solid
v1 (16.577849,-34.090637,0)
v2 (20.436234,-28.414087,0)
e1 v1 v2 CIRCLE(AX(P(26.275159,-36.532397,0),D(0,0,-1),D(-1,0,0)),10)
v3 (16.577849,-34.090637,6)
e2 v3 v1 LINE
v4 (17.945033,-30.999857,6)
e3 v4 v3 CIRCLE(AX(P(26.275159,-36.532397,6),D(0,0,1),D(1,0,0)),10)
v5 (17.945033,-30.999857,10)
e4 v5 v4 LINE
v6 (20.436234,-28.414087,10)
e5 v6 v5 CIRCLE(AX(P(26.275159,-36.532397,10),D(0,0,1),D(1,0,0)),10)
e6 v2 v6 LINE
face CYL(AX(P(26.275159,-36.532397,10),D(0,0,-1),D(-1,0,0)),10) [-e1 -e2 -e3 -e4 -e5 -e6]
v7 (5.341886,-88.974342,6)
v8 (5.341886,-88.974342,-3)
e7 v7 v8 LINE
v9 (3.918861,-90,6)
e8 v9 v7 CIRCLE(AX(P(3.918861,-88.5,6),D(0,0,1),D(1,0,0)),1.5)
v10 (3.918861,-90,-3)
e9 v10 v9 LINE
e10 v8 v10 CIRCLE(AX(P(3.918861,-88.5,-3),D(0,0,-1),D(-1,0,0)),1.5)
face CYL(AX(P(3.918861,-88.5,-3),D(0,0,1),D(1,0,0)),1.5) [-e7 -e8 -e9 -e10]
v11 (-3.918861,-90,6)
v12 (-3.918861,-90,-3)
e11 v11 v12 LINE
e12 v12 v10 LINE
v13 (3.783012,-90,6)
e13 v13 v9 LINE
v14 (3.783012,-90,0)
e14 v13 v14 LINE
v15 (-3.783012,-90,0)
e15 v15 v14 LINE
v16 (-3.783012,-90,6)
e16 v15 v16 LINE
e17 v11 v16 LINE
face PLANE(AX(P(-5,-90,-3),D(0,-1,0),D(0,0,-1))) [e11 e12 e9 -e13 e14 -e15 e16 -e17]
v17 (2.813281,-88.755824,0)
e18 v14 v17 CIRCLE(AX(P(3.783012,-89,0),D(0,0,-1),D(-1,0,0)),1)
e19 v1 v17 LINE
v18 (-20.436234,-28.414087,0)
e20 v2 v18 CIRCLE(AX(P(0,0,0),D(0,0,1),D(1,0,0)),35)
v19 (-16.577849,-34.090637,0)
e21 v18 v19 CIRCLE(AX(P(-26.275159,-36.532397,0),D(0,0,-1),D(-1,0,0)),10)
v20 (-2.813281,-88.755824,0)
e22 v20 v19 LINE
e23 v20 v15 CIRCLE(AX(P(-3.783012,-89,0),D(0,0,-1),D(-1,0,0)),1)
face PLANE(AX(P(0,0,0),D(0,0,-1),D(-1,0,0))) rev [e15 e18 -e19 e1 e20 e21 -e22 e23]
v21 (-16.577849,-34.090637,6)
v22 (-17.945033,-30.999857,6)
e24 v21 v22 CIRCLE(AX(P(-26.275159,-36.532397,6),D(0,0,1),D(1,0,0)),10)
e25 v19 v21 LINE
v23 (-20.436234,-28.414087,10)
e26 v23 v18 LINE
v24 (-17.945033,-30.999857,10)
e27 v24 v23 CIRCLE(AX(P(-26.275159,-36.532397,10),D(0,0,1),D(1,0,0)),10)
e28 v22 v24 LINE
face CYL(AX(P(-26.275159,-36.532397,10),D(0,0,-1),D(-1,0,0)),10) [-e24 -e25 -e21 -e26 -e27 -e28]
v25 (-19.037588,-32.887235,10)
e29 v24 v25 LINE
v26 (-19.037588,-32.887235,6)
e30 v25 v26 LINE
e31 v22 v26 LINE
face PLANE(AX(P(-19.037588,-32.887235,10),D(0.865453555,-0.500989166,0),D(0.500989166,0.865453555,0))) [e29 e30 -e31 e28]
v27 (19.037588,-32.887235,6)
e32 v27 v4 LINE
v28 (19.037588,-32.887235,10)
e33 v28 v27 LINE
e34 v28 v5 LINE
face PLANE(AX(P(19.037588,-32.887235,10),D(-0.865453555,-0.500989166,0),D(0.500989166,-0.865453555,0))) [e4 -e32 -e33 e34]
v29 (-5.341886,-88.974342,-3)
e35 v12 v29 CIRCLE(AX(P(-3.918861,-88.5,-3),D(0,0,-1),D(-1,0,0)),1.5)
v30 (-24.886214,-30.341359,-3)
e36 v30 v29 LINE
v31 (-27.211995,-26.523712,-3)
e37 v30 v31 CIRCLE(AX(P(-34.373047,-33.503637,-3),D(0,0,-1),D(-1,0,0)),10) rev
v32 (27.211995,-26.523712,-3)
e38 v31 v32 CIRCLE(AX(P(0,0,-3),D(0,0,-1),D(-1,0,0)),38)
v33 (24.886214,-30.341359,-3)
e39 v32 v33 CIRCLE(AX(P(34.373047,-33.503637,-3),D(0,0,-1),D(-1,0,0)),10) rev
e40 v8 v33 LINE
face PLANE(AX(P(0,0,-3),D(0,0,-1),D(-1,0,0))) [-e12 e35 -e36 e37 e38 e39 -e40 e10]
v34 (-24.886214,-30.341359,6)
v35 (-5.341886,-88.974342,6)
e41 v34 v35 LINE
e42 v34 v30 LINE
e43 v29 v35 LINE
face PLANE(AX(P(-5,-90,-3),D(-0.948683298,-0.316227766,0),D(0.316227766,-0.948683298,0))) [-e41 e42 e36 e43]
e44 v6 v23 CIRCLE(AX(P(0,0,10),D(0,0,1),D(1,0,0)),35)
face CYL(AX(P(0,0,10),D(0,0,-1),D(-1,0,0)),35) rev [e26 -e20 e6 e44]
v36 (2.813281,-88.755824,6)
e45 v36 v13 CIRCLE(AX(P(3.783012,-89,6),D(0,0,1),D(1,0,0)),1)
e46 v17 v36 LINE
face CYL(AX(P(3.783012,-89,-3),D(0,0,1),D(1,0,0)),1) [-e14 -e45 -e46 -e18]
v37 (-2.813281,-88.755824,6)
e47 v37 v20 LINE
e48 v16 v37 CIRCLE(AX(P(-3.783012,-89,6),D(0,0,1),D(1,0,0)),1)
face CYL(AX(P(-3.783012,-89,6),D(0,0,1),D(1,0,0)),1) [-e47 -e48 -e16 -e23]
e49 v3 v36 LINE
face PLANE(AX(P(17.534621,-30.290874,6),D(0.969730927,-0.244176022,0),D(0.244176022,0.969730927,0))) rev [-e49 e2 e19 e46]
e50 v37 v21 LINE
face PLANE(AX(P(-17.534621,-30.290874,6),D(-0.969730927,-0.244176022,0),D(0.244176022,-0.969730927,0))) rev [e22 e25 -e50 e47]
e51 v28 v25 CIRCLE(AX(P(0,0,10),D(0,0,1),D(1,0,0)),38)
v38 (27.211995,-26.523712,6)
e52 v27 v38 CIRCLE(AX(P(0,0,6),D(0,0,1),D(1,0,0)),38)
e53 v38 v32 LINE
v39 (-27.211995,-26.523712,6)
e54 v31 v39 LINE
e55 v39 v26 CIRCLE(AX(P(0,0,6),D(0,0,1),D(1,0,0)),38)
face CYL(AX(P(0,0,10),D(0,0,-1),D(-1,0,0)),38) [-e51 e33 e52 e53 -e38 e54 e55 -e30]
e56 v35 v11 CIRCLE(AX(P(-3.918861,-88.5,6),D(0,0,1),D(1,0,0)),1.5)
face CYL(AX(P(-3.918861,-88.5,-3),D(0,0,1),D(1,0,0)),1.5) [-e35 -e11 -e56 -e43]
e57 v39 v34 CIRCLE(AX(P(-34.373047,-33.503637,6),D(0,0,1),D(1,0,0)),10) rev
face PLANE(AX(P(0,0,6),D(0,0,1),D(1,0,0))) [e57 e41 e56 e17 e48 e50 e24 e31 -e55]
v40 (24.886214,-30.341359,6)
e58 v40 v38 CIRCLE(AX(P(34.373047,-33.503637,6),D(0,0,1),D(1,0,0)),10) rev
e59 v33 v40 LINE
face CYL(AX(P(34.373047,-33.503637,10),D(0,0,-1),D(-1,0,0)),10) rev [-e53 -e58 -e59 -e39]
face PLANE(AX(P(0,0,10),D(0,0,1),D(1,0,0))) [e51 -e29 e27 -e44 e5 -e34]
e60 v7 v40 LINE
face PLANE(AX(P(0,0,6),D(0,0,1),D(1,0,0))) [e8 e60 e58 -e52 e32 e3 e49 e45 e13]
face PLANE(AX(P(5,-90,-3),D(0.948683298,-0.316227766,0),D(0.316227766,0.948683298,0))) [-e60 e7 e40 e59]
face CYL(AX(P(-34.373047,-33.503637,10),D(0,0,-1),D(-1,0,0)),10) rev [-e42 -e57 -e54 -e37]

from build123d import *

# Parameters (mm, degrees)
ESQUISSE1_R             = 38
ESQUISSE1_R_2           = 35
BOSS_EXTRU_1_DEPTH      = 10
BOSS_EXTRU_2_START      = 3
ESQUISSE2_R             = 38
BOSS_EXTRU_2_DEPTH      = 3
BOSS_EXTRU_3_DEPTH      = 3
ENL_V_MAT_EXTRU_1_DEPTH = 99.203869578
BOSS_EXTRU_4_DEPTH      = 6
CONG_1_R                = 10
CONG_3_R                = 1
CONG_4_R                = 1.5


with BuildPart() as part:
    # Esquisse1 → Boss.-Extru.1 (new body)
    with BuildSketch(Plane.XY):
        Circle(ESQUISSE1_R)
        Circle(ESQUISSE1_R_2, mode=Mode.SUBTRACT)
    extrude(amount=BOSS_EXTRU_1_DEPTH)

    # Esquisse2 → Boss.-Extru.2 (add)
    with BuildSketch(Plane(origin=(0, 0, 0), x_dir=(-1, 0, 0), z_dir=(0, 0, -1)).offset(BOSS_EXTRU_2_START)):
        Circle(ESQUISSE2_R)
    extrude(amount=-BOSS_EXTRU_2_DEPTH)

    # Esquisse3 → Boss.-Extru.3 (add)
    with BuildSketch(Plane.XY):
        Polygon((-5, -90), (5, -90), (25.656199867, -28.0314004), (-25.656199867, -28.0314004), align=None)
    extrude(amount=-BOSS_EXTRU_3_DEPTH)

    # Esquisse4 → Enlèv. mat.-Extru.1 (cut, through all)
    with BuildSketch(Plane.XY):
        Polygon((-19.037588305, -32.887235085), (-17.534620807, -30.29087442), (17.534620807, -30.29087442), (19.037588305, -32.887235085), (0, -90), align=None)
    extrude(amount=ENL_V_MAT_EXTRU_1_DEPTH, mode=Mode.SUBTRACT)

    # Esquisse5 → Boss.-Extru.4 (add)
    with BuildSketch(Plane.XY):
        Polygon((-5, -90), (-25.656199867, -28.0314004), (-17.534620807, -30.29087442), (-2.5, -90), align=None)
        Polygon((2.5, -90), (5, -90), (25.656199867, -28.0314004), (17.534620807, -30.29087442), align=None)
    extrude(amount=BOSS_EXTRU_4_DEPTH)

    # Congé1
    # the kernel refuses this fillet: 10 mm, written as the material it adds along each edge
    with BuildSketch(Plane(origin=(25.656199867, -28.0314004, 6), x_dir=(0.7181222649547252, 0.6959169581036918, 0), z_dir=(0, 0, -1)), Plane(origin=(-25.656199867, -28.0314004, -3), x_dir=(-0.7181222649547252, 0.6959169581036918, 0), z_dir=(0, 0, 1))) as cong_1_piece_1:
        with BuildLine():
            CenterArc((2.451539853, 9.995936135), CONG_1_R, 242.53528085, 25.831208482)
            Line((-2.160483484, 1.122986189), (0, 0))
            ThreePointArc((0, 0), (1.08323854, 0.015442687), (2.16647708, 0))
        make_face()
    extrude(amount=9)
    # the kernel refuses this fillet: 10 mm, written as the material it takes off along each edge
    with BuildSketch(Plane(origin=(17.534620807, -30.29087442, 0), x_dir=(0.8396660922433514, 0.5431029861239759, 0), z_dir=(0, 0, 1))) as cong_1_2_piece_1:
        with BuildLine():
            CenterArc((3.949343583, -9.987807165), CONG_1_R, 92.829659135, 40.142072995)
            Line((-2.867030927, -2.670906281), (0, 0))
            ThreePointArc((0, 0), (1.727837818, -0.042674924), (3.455675635, 0))
        make_face()
    extrude(amount=15.795919653, mode=Mode.SUBTRACT)
    with BuildSketch(Plane(origin=(-17.534620807, -30.29087442, 0), x_dir=(-0.839666092243352, 0.5431029861239753, 0), z_dir=(0, 0, 1))) as cong_1_2_piece_2:
        with BuildLine():
            CenterArc((3.949343583, 9.987807165), CONG_1_R, 227.028267869, 40.142072995)
            Line((-2.867030927, 2.670906281), (0, 0))
            ThreePointArc((0, 0), (1.727837818, 0.042674924), (3.455675635, 0))
        make_face()
    extrude(amount=15.795919653, mode=Mode.SUBTRACT)

    # Congé3
    cong_3_edges = [part.edges().sort_by_distance(p)[0] for p in [
        (-2.5, -90, 3),
        (2.5, -90, 3),
    ]]
    fillet(cong_3_edges, radius=CONG_3_R)

    # Congé4
    cong_4_edges = [part.edges().sort_by_distance(p)[0] for p in [
        (-5, -90, 1.5),
        (5, -90, 1.5),
    ]]
    fillet(cong_4_edges, radius=CONG_4_R)


solid = part.part
